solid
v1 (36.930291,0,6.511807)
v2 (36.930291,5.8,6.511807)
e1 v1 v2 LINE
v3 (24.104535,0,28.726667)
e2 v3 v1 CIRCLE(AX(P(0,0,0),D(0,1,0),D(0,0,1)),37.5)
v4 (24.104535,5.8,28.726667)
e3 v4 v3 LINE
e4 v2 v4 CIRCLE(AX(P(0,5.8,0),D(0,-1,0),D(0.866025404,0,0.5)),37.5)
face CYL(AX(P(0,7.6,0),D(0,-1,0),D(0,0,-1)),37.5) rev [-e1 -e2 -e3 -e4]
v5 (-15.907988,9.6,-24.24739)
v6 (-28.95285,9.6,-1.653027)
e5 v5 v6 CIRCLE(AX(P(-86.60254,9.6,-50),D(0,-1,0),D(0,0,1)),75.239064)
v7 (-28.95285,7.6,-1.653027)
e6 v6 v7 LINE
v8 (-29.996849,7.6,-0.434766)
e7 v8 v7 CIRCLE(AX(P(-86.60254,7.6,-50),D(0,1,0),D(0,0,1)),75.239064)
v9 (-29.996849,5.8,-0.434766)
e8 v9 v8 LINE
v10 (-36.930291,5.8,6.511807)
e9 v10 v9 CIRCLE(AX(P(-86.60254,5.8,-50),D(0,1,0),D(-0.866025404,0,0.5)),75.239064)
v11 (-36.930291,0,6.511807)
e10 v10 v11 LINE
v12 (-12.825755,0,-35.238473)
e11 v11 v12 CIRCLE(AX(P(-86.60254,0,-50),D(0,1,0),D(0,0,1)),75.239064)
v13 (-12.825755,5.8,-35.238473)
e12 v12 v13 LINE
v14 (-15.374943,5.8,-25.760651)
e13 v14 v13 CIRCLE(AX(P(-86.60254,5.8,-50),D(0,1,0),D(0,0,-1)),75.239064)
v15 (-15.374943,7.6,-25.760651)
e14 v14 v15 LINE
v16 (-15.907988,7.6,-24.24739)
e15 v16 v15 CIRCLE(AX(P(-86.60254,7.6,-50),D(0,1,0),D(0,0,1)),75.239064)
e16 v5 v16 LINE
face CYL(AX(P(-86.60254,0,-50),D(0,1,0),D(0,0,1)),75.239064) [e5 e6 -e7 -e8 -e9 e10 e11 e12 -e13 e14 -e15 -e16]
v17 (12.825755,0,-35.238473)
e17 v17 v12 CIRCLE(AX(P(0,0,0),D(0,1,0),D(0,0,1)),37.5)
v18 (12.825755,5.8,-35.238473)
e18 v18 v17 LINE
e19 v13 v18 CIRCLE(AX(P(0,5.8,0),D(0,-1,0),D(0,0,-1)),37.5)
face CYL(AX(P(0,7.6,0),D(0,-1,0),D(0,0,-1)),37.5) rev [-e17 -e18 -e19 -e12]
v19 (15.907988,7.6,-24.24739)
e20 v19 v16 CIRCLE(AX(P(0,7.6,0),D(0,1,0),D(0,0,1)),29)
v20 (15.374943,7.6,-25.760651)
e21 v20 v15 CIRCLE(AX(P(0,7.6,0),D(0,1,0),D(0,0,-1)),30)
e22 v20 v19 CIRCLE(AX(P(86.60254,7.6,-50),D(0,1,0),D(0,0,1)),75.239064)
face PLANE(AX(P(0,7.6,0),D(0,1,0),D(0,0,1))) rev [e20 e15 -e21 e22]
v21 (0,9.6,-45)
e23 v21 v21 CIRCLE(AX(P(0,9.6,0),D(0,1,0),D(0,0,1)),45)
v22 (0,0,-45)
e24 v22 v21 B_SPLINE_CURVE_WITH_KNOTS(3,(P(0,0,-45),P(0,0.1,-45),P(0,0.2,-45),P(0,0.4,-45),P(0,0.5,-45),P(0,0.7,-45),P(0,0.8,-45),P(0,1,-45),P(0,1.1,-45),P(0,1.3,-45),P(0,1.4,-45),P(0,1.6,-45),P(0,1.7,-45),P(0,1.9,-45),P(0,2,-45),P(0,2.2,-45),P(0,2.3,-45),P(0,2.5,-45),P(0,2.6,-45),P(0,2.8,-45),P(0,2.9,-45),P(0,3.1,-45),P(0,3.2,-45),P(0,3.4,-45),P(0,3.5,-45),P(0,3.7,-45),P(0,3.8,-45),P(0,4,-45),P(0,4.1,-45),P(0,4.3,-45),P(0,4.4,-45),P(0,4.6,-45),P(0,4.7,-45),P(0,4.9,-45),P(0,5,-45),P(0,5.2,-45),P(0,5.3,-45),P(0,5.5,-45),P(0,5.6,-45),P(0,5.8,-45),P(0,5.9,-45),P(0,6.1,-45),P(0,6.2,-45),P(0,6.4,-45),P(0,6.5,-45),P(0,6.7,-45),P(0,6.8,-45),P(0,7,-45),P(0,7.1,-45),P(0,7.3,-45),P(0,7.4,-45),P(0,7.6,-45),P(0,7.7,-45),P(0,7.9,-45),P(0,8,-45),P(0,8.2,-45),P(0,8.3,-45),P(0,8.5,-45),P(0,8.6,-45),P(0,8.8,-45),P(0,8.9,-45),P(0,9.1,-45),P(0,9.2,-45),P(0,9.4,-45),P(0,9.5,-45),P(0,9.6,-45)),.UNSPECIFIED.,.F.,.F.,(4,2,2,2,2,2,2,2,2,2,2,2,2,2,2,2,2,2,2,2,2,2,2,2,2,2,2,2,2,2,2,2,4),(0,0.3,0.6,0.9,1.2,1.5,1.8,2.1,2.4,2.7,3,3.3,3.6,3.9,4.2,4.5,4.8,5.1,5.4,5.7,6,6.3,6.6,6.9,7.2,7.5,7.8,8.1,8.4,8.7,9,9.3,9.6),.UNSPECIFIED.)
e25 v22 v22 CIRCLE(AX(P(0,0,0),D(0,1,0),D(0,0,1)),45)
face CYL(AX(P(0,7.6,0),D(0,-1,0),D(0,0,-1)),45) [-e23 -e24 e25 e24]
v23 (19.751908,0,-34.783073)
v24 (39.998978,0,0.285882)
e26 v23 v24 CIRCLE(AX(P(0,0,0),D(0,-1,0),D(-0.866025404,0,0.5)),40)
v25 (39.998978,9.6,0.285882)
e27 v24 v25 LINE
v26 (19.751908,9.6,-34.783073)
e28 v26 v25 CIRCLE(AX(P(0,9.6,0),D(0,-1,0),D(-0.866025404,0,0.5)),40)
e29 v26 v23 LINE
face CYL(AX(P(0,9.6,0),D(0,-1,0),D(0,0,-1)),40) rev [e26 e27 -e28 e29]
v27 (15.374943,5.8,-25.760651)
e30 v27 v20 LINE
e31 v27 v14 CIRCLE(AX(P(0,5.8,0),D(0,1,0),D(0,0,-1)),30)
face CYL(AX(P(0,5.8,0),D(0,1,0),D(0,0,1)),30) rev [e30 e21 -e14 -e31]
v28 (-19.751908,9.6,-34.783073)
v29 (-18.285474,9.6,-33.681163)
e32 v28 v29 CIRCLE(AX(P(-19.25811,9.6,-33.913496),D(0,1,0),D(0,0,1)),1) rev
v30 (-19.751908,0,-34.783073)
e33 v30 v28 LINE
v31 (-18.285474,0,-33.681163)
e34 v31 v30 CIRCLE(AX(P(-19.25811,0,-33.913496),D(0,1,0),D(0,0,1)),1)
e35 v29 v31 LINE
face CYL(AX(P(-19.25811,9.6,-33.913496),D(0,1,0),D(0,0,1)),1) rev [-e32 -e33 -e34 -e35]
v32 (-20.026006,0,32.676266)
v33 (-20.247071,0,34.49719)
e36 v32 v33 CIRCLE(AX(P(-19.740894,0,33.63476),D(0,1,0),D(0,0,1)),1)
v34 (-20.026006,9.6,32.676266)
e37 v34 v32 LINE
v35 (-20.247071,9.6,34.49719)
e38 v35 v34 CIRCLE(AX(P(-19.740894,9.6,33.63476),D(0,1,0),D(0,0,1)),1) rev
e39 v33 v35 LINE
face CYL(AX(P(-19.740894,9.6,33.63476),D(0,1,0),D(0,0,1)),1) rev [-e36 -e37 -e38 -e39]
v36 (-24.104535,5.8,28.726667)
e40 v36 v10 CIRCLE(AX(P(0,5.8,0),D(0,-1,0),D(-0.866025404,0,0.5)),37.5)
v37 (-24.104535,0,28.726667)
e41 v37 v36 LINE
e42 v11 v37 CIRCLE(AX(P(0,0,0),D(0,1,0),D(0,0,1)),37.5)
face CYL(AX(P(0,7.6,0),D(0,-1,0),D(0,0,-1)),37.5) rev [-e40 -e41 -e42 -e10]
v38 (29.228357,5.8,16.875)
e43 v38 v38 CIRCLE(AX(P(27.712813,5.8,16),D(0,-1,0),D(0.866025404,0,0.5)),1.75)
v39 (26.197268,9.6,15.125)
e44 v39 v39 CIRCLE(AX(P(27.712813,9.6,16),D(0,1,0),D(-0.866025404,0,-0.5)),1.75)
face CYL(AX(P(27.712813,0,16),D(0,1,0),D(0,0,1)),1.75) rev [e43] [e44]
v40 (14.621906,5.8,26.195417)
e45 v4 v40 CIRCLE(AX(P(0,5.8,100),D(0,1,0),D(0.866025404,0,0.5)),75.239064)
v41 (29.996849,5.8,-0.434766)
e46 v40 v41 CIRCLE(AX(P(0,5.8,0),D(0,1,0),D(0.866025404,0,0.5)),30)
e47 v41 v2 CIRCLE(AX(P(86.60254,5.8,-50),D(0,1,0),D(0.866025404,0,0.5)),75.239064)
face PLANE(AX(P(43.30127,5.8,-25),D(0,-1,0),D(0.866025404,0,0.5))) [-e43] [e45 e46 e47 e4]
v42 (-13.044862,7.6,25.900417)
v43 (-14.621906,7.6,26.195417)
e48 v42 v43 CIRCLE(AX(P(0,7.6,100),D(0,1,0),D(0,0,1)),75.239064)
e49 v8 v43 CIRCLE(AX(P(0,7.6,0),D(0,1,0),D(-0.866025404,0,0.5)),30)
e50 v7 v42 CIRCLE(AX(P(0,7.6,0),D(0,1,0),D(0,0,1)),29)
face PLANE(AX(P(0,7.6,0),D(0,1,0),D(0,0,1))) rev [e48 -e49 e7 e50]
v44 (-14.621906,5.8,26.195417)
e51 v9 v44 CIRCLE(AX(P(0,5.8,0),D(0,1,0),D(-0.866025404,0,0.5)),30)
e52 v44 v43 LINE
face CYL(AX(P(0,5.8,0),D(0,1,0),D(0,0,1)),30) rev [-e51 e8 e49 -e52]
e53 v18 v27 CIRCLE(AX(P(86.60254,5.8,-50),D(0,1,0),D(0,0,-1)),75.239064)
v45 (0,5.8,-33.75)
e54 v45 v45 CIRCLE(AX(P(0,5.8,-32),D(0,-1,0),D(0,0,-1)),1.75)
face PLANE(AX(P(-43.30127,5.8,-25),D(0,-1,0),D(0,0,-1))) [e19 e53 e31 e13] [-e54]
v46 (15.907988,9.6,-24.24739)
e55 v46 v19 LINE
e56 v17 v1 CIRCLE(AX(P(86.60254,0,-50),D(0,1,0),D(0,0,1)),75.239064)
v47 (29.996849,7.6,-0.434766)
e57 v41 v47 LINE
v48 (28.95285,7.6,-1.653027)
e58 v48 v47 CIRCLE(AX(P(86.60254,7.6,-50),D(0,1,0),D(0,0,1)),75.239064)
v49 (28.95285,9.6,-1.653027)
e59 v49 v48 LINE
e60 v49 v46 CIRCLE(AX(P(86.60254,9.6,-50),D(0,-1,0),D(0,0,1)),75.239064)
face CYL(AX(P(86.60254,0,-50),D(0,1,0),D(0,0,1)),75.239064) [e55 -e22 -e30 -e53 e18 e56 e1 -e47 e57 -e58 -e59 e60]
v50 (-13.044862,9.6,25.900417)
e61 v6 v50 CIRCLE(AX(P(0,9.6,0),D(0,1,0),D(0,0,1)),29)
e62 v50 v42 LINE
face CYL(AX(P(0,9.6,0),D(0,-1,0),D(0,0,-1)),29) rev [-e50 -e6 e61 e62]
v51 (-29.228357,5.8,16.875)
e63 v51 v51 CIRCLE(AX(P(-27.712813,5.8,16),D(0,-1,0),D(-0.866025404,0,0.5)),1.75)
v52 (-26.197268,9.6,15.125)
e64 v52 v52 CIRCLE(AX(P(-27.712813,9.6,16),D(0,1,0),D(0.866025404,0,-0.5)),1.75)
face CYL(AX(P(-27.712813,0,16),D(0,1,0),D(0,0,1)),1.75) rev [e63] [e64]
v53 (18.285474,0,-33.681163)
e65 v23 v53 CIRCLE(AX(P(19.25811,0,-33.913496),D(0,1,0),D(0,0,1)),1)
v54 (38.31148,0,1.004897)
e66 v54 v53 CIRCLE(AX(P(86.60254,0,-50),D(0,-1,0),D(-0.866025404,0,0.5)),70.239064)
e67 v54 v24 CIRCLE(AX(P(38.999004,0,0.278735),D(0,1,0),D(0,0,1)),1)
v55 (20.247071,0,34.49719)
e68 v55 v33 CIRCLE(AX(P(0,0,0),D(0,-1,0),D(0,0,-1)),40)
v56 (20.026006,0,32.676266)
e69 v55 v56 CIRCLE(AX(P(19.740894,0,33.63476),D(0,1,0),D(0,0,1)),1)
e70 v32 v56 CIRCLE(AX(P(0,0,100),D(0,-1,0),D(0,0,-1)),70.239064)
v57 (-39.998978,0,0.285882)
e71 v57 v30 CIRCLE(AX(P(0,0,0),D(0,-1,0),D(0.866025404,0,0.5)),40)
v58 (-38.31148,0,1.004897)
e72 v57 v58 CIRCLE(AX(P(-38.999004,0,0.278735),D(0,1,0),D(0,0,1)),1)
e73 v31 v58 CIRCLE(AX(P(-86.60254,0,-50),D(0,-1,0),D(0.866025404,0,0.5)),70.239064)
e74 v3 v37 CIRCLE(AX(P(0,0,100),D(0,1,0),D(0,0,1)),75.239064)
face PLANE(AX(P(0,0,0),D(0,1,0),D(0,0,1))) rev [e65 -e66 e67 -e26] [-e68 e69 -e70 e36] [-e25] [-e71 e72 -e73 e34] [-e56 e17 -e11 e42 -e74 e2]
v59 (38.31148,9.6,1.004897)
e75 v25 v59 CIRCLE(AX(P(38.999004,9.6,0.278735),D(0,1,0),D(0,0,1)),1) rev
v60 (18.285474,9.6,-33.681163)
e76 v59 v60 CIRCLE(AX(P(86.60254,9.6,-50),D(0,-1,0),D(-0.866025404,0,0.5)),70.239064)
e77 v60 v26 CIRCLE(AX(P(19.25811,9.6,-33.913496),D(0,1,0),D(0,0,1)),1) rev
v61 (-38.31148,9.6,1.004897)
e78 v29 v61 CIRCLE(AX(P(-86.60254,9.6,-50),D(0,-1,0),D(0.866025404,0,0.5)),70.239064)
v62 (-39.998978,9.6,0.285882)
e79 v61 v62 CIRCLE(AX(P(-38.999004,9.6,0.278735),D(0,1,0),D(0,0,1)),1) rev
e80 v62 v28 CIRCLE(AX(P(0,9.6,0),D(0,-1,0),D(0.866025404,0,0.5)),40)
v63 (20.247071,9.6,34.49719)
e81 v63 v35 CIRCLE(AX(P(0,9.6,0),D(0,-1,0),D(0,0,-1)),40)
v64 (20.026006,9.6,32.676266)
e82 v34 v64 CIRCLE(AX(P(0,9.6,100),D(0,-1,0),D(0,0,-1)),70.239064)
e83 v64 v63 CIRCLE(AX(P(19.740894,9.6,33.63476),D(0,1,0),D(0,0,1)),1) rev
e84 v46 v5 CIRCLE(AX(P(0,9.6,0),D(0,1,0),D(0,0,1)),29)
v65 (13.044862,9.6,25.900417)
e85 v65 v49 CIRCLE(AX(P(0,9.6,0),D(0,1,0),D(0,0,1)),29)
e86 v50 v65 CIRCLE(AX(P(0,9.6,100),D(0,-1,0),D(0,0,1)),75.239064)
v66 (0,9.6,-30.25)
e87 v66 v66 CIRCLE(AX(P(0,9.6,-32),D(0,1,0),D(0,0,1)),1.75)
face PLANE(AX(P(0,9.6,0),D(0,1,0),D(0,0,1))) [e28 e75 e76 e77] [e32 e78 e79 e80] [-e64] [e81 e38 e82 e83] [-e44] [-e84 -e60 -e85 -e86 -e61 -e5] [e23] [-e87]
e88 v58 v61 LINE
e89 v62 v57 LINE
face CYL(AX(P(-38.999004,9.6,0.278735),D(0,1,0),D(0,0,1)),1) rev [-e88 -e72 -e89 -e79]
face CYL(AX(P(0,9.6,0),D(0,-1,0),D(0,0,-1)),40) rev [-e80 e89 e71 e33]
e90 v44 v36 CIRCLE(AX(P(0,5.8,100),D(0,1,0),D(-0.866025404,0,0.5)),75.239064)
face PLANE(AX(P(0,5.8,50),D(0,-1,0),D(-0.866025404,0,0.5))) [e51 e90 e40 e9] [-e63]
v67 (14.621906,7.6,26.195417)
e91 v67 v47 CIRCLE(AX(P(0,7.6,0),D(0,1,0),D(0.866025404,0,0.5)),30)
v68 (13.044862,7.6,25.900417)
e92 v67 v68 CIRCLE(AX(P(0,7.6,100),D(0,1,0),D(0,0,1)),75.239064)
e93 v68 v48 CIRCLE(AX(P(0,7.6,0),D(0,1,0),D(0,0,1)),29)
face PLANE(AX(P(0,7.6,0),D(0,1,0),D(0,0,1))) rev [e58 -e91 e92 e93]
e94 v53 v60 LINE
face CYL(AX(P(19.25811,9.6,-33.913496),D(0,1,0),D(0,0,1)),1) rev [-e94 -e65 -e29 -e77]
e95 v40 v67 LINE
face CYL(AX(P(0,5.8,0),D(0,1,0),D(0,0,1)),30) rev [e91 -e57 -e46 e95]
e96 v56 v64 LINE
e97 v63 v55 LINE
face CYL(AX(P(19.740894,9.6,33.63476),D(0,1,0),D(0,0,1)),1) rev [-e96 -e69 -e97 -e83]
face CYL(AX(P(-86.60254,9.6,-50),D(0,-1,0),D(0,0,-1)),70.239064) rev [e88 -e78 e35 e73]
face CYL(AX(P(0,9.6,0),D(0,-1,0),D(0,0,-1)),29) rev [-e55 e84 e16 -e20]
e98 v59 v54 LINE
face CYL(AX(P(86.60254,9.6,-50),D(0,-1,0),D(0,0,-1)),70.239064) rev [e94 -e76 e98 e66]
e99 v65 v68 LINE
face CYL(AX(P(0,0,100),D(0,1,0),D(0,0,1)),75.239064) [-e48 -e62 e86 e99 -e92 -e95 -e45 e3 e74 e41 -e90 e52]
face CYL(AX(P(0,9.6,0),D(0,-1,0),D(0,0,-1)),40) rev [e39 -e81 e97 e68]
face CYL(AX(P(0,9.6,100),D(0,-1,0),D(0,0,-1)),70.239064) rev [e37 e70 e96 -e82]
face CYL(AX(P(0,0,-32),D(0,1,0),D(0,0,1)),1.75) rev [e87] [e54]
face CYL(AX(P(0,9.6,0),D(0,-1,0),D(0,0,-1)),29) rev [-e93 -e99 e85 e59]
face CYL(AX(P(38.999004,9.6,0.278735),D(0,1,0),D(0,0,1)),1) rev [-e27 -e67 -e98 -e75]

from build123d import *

# Parameters (mm, degrees)
SKETCH1_R                = 37.5
BOSS_EXTRUDE1_DEPTH      = 7.6
CUT_EXTRUDE2_START       = -7.6
CUT_EXTRUDE2_DEPTH       = 7.6
SKETCH4_R                = 45
SKETCH4_R_2              = 37.5
BOSS_EXTRUDE2_DEPTH      = 7.6
SKETCH6_R                = 45
BOSS_EXTRUDE3_DEPTH      = 2
SKETCH7_R                = 1.75
CUT_EXTRUDE3_DEPTH       = 65.359614666
CIRPATTERN2_COUNT        = 3
CUT_EXTRUDE7_DEPTH       = 65.359614666
FILLET3_R                = 1
CIRPATTERN3_COUNT        = 3
FILLET3_OF_CIRPATTERN3_R = 1
BOSS_EXTRUDE4_START      = 1.8
SKETCH15_R               = 1.75
BOSS_EXTRUDE4_DEPTH      = 1.8
CIRPATTERN4_COUNT        = 3


# Read off the part's stored shape, not the designer's step: Cut-Extrude2
with BuildPart() as part:
    # Sketch1 → Boss-Extrude1 (new body)
    with BuildSketch(Plane(origin=(0, 0, 0), x_dir=(1, 0, 0), z_dir=(0, 1, 0))):
        with Locations(Location((0, 0, 0), (0, 0, 90))):
            Circle(SKETCH1_R)
    extrude(amount=BOSS_EXTRUDE1_DEPTH)

    # Cut-Extrude2 outline → Cut-Extrude2 (cut)
    with BuildSketch(Plane(origin=(0, 7.6, 0), x_dir=(1, 0, 0), z_dir=(0, 1, 0)).offset(CUT_EXTRUDE2_START)):
        with BuildLine():
            ThreePointArc((-24.104535363, -28.726666617), (0, -24.760936498), (24.104535363, -28.726666617))
            ThreePointArc((24.104535363, -28.726666617), (32.475952642, -18.75), (36.930290738, -6.511806663))
            ThreePointArc((36.930290738, -6.511806663), (21.443600029, 12.380468249), (12.825755375, 35.238473279))
            ThreePointArc((12.825755375, 35.238473279), (0, 37.5), (-12.825755375, 35.238473279))
            ThreePointArc((-12.825755375, 35.238473279), (-21.443600029, 12.380468249), (-36.930290738, -6.511806663))
            ThreePointArc((-36.930290738, -6.511806663), (-32.475952642, -18.75), (-24.104535363, -28.726666617))
        make_face()
    extrude(amount=CUT_EXTRUDE2_DEPTH, mode=Mode.SUBTRACT)

    # Sketch4 → Boss-Extrude2 (add)
    with BuildSketch(Plane(origin=(0, 0, 0), x_dir=(1, 0, 0), z_dir=(0, 1, 0))):
        with Locations(Location((0, 0, 0), (0, 0, 90))):
            Circle(SKETCH4_R)
        Circle(SKETCH4_R_2, mode=Mode.SUBTRACT)
    extrude(amount=BOSS_EXTRUDE2_DEPTH)

    # Sketch6 → Boss-Extrude3 (add)
    with BuildSketch(Plane(origin=(0, 7.6, 0), x_dir=(1, 0, 0), z_dir=(0, 1, 0))):
        with Locations(Location((0, 0, 0), (0, 0, 90))):
            Circle(SKETCH6_R)
        with BuildLine():
            ThreePointArc((-28.952849653, 1.653026611), (-25.11473671, -14.5), (-13.044861788, -25.900416617))
            ThreePointArc((-13.044861788, -25.900416617), (0, -24.760936498), (13.044861788, -25.900416617))
            ThreePointArc((13.044861788, -25.900416617), (25.11473671, -14.5), (28.952849653, 1.653026611))
            ThreePointArc((28.952849653, 1.653026611), (21.443600029, 12.380468249), (15.907987865, 24.247390006))
            ThreePointArc((15.907987865, 24.247390006), (0, 29), (-15.907987865, 24.247390006))
            ThreePointArc((-15.907987865, 24.247390006), (-21.443600029, 12.380468249), (-28.952849653, 1.653026611))
        make_face(mode=Mode.SUBTRACT)
    extrude(amount=BOSS_EXTRUDE3_DEPTH)

    # Sketch7 → Cut-Extrude3 (cut, through all)
    with BuildSketch(Plane(origin=(0, 9.6, 0), x_dir=(1, 0, 0), z_dir=(0, 1, 0))):
        with Locations(Location((0, 32, 0), (0, 0, 270))):
            Circle(SKETCH7_R)
    cut_extrude3 = extrude(amount=-CUT_EXTRUDE3_DEPTH, mode=Mode.SUBTRACT)

    # CirPattern2: Cut-Extrude3 ×3 about axis
    cirpattern2_axis = Axis((0, 0, 0), (0, 1, 0))
    for i in range(1, CIRPATTERN2_COUNT):
        add(cut_extrude3.rotate(cirpattern2_axis, i * 360 / CIRPATTERN2_COUNT), mode=Mode.SUBTRACT)

    # Sketch13 → Cut-Extrude7 (cut, through all)
    with BuildSketch(Plane.XZ):
        with BuildLine():
            ThreePointArc((-22.11228446, 33.332369792), (0, 29.760936498), (22.11228446, 33.332369792))
            ThreePointArc((22.11228446, 33.332369792), (0, 40), (-22.11228446, 33.332369792))
        make_face()
    cut_extrude7 = extrude(amount=-CUT_EXTRUDE7_DEPTH, mode=Mode.SUBTRACT)

    # Fillet3
    fillet3_edges = [part.edges().sort_by_distance(p)[0] for p in [
        (-22.11228446, 4.8, 33.332369792),
        (22.11228446, 4.8, 33.332369792),
    ]]
    fillet(fillet3_edges, radius=FILLET3_R)

    # CirPattern3: Cut-Extrude7 ×3 about axis
    cirpattern3_axis = Axis((0, 0, 0), (0, 1, 0))
    for i in range(1, CIRPATTERN3_COUNT):
        add(cut_extrude7.rotate(cirpattern3_axis, i * 360 / CIRPATTERN3_COUNT), mode=Mode.SUBTRACT)

    # Fillet3 of CirPattern3
    fillet3_of_cirpattern3_edges = [part.edges().sort_by_distance(p)[0] for p in [
        (39.922821238, 4.8, 2.483615182),
        (17.810536778, 4.8, -35.815984974),
        (-17.810536778, 4.8, -35.815984974),
        (-39.922821238, 4.8, 2.483615182),
    ]]
    fillet(fillet3_of_cirpattern3_edges, radius=FILLET3_OF_CIRPATTERN3_R)

    # Sketch15 → Boss-Extrude4 (add)
    with BuildSketch(Plane.XZ.offset(-7.6).offset(BOSS_EXTRUDE4_START)):
        with BuildLine():
            ThreePointArc((-15.374943027, -25.760650747), (0, -30), (15.374943027, -25.760650747))
            ThreePointArc((15.374943027, -25.760650747), (13.94564115, -30.457951205), (12.825755375, -35.238473279))
            ThreePointArc((12.825755375, -35.238473279), (0, -37.5), (-12.825755375, -35.238473279))
            ThreePointArc((-12.825755375, -35.238473279), (-13.94564115, -30.457951205), (-15.374943027, -25.760650747))
        make_face()
        with Locations(Location((0, -32, 0), (0, 0, 90))):
            Circle(SKETCH15_R, mode=Mode.SUBTRACT)
    boss_extrude4 = extrude(amount=-BOSS_EXTRUDE4_DEPTH)

    # CirPattern4: Boss-Extrude4 ×3 about axis
    cirpattern4_axis = Axis((0, 7.6, 0), (0, -1, 0))
    for i in range(1, CIRPATTERN4_COUNT):
        add(boss_extrude4.rotate(cirpattern4_axis, i * 360 / CIRPATTERN4_COUNT))


solid = part.part
